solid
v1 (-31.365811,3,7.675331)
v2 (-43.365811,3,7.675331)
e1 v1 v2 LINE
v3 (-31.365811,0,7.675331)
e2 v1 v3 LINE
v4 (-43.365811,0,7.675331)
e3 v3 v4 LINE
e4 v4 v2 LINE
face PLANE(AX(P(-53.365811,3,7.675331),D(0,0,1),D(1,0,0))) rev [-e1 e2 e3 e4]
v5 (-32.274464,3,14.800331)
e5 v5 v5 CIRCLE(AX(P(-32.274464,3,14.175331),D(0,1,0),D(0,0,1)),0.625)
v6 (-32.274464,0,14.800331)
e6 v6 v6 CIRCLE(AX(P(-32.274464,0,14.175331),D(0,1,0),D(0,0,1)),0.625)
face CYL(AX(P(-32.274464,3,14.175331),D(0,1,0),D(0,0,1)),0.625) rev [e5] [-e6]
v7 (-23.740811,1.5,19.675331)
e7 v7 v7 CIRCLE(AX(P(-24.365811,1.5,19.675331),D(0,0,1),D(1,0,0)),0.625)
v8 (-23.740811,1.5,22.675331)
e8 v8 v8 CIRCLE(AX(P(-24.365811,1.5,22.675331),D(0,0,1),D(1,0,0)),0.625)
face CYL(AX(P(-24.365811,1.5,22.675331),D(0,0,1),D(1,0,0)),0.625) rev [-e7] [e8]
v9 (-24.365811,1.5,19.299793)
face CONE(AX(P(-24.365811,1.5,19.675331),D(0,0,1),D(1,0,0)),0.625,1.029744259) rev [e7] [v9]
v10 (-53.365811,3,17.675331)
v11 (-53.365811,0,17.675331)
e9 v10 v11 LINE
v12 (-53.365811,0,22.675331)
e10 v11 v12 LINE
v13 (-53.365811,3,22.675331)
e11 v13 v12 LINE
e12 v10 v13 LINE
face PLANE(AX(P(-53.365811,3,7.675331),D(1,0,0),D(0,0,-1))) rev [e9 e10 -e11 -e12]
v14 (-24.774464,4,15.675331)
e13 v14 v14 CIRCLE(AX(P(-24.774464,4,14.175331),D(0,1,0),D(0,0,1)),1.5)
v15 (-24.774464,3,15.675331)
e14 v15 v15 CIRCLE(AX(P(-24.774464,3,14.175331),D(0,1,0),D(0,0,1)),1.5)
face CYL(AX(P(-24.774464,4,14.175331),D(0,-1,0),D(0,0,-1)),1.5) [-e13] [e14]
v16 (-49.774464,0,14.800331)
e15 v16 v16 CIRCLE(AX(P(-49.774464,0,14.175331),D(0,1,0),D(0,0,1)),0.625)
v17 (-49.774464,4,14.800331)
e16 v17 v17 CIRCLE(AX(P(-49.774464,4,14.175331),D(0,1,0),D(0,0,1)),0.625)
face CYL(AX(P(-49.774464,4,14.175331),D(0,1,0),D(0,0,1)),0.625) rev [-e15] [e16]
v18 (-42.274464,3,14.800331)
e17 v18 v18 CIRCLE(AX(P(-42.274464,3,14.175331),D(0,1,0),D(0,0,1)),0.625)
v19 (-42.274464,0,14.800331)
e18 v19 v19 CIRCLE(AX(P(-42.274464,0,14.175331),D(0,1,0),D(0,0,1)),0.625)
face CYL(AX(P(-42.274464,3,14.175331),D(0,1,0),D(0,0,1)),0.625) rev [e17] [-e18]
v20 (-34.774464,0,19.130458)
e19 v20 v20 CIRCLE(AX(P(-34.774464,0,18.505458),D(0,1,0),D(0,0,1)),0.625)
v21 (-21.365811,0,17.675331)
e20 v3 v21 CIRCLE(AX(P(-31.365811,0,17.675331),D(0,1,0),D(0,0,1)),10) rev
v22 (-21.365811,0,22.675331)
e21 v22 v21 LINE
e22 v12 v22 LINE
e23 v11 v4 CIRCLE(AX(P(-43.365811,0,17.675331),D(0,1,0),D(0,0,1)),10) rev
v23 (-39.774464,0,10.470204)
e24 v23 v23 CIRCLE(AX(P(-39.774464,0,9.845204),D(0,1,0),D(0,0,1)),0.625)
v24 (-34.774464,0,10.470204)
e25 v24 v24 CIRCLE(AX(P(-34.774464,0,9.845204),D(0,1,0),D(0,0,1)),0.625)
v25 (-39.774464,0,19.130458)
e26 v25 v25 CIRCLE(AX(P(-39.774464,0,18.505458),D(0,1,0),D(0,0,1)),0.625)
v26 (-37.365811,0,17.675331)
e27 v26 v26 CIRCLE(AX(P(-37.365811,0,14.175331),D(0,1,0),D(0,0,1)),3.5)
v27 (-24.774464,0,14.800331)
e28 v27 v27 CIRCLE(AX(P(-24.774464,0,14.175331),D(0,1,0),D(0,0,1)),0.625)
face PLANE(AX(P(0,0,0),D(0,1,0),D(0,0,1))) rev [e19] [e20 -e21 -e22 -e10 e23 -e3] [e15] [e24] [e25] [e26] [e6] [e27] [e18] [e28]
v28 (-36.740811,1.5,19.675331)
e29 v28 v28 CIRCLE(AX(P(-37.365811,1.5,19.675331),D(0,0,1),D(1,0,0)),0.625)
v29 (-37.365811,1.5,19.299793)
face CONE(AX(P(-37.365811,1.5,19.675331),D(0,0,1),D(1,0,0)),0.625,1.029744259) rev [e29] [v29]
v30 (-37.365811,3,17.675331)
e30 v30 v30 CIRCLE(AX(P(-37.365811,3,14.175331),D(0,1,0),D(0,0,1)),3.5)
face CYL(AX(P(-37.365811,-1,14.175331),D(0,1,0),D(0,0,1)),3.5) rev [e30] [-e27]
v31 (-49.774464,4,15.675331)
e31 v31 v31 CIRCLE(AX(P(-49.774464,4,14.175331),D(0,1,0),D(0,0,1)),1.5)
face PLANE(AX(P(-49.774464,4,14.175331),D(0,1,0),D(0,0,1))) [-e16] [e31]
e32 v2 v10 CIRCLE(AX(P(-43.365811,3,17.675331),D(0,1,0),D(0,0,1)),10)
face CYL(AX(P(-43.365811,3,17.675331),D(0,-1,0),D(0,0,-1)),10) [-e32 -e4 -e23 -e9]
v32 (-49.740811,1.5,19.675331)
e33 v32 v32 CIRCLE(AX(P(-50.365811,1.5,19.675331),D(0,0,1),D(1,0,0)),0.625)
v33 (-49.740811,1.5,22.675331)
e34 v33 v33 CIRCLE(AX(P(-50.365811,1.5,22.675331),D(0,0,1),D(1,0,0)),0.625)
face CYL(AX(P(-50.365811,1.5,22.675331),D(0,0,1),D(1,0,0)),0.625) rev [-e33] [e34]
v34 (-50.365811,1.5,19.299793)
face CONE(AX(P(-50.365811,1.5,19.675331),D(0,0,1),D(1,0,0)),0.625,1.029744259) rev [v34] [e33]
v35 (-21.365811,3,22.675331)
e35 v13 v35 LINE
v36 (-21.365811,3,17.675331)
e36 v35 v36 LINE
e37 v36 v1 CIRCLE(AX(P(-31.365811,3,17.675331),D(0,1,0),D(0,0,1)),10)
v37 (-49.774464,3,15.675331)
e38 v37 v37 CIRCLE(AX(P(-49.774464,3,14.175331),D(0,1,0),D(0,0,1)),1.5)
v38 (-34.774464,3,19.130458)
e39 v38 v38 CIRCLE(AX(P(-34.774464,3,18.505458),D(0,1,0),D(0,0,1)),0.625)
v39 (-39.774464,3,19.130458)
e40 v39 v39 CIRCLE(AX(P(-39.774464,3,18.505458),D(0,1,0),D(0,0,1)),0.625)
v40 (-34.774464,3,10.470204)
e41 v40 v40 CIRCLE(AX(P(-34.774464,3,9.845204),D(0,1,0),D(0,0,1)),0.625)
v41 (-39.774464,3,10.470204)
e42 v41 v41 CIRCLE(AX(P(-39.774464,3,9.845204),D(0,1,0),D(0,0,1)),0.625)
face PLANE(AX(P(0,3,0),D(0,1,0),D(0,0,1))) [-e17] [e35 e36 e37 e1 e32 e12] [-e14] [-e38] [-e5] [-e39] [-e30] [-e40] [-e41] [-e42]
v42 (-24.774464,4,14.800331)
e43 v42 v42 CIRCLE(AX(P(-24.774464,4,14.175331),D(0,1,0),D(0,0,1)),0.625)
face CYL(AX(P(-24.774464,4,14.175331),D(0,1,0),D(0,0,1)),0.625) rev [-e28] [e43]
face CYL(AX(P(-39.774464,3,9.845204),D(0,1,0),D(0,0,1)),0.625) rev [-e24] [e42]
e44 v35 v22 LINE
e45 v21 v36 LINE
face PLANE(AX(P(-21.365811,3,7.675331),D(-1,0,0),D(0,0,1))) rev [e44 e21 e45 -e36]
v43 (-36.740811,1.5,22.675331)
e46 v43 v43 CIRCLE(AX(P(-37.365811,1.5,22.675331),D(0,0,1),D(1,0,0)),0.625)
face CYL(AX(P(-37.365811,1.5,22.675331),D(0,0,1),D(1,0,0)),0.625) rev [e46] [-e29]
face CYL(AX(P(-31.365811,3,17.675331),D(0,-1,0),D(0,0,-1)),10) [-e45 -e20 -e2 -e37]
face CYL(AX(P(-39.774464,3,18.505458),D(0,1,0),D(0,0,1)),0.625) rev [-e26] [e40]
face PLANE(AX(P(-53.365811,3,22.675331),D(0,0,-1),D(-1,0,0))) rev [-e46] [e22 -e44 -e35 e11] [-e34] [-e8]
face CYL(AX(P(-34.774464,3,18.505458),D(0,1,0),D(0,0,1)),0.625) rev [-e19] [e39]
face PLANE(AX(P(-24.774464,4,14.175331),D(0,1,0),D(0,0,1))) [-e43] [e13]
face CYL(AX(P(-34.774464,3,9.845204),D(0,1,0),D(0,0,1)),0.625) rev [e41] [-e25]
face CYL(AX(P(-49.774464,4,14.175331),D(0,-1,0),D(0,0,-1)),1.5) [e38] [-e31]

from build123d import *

# Parameters (mm, degrees)
SKETCH1_W                        = 32
SKETCH1_H                        = 15
BOSS_EXTRUDE1_DEPTH              = 3
SKETCH2_R                        = 3.5
CUT_EXTRUDE1_DEPTH               = 4
M1_6X0_35_TAPPED_HOLE2_D         = 1.25
SKETCH21_R                       = 1.5
BOSS_EXTRUDE4_DEPTH              = 1
M1_6X0_35_TAPPED_HOLE3_OUTLINE_R = 0.625
M1_6X0_35_TAPPED_HOLE3_DEPTH     = 4
FILLET1_R                        = 10
M1_6X0_35_TAPPED_HOLE4_D         = 1.25
M1_6X0_35_TAPPED_HOLE4_DEPTH     = 3
M1_6X0_35_TAPPED_HOLE4_TIP       = 0.375537887


# Read off the part's stored shape, not the designer's step: M1.6x0.35 Tapped Hole3
with BuildPart() as part:
    # Sketch1 → Boss-Extrude1 (new body)
    with BuildSketch(Plane(origin=(0, 0, 0), x_dir=(1, 0, 0), z_dir=(0, 1, 0))):
        with Locations((-37.365810967, -15.175330849)):
            Rectangle(SKETCH1_W, SKETCH1_H)
    extrude(amount=BOSS_EXTRUDE1_DEPTH)

    # Sketch2 → Cut-Extrude1 (cut)
    with BuildSketch(Plane(origin=(0, 3, 0), x_dir=(1, 0, 0), z_dir=(0, 1, 0))):
        with Locations(Location((-37.365810967, -14.175330849, 0), (0, 0, 270))):
            Circle(SKETCH2_R)
    extrude(amount=-CUT_EXTRUDE1_DEPTH, mode=Mode.SUBTRACT)

    # M1.6x0.35 Tapped Hole2 (through all)
    with Locations(Plane(origin=(0, 3, 0), x_dir=(1, 0, 0), z_dir=(0, 1, 0))):
        with Locations((-34.774464311, -18.505457868), (-39.774464311, -18.505457868), (-42.274464311, -14.175330849), (-39.774464311, -9.84520383), (-34.774464311, -9.84520383), (-32.274464311, -14.175330849)):
            Hole(M1_6X0_35_TAPPED_HOLE2_D / 2)

    # Sketch21 → Boss-Extrude4 (add)
    with BuildSketch(Plane(origin=(0, 3, 0), x_dir=(1, 0, 0), z_dir=(0, 1, 0))):
        with Locations(Location((-49.774464311, -14.175330849, 0), (0, 0, 270))):
            Circle(SKETCH21_R)
        with Locations(Location((-24.774464311, -14.175330849, 0), (0, 0, 270))):
            Circle(SKETCH21_R)
    extrude(amount=BOSS_EXTRUDE4_DEPTH)

    # M1.6x0.35 Tapped Hole3 outline → M1.6x0.35 Tapped Hole3 (cut)
    with BuildSketch(Plane(origin=(0, 0, 0), x_dir=(1, 0, 0), z_dir=(0, 1, 0))):
        with Locations((-24.774464311, -14.175330849)):
            Circle(M1_6X0_35_TAPPED_HOLE3_OUTLINE_R)
        with Locations((-49.774464311, -14.175330849)):
            Circle(M1_6X0_35_TAPPED_HOLE3_OUTLINE_R)
    extrude(amount=M1_6X0_35_TAPPED_HOLE3_DEPTH, mode=Mode.SUBTRACT)

    # Fillet1
    fillet1_edges = [part.edges().sort_by_distance(p)[0] for p in [
        (-53.365810967, 1.5, 7.675330849),
        (-21.365810967, 1.5, 7.675330849),
    ]]
    fillet(fillet1_edges, radius=FILLET1_R)

    # M1.6x0.35 Tapped Hole4
    with Locations(Plane.XY.offset(22.675330849)):
        with Locations((-50.365810967, 1.5), (-24.365810967, 1.5), (-37.365810967, 1.5)):
            Hole(M1_6X0_35_TAPPED_HOLE4_D / 2, depth=M1_6X0_35_TAPPED_HOLE4_DEPTH)
            with Locations((0, 0, -(M1_6X0_35_TAPPED_HOLE4_DEPTH + M1_6X0_35_TAPPED_HOLE4_TIP / 2))):  # 118° drill point
                Cone(0, M1_6X0_35_TAPPED_HOLE4_D / 2, M1_6X0_35_TAPPED_HOLE4_TIP, mode=Mode.SUBTRACT)


solid = part.part
